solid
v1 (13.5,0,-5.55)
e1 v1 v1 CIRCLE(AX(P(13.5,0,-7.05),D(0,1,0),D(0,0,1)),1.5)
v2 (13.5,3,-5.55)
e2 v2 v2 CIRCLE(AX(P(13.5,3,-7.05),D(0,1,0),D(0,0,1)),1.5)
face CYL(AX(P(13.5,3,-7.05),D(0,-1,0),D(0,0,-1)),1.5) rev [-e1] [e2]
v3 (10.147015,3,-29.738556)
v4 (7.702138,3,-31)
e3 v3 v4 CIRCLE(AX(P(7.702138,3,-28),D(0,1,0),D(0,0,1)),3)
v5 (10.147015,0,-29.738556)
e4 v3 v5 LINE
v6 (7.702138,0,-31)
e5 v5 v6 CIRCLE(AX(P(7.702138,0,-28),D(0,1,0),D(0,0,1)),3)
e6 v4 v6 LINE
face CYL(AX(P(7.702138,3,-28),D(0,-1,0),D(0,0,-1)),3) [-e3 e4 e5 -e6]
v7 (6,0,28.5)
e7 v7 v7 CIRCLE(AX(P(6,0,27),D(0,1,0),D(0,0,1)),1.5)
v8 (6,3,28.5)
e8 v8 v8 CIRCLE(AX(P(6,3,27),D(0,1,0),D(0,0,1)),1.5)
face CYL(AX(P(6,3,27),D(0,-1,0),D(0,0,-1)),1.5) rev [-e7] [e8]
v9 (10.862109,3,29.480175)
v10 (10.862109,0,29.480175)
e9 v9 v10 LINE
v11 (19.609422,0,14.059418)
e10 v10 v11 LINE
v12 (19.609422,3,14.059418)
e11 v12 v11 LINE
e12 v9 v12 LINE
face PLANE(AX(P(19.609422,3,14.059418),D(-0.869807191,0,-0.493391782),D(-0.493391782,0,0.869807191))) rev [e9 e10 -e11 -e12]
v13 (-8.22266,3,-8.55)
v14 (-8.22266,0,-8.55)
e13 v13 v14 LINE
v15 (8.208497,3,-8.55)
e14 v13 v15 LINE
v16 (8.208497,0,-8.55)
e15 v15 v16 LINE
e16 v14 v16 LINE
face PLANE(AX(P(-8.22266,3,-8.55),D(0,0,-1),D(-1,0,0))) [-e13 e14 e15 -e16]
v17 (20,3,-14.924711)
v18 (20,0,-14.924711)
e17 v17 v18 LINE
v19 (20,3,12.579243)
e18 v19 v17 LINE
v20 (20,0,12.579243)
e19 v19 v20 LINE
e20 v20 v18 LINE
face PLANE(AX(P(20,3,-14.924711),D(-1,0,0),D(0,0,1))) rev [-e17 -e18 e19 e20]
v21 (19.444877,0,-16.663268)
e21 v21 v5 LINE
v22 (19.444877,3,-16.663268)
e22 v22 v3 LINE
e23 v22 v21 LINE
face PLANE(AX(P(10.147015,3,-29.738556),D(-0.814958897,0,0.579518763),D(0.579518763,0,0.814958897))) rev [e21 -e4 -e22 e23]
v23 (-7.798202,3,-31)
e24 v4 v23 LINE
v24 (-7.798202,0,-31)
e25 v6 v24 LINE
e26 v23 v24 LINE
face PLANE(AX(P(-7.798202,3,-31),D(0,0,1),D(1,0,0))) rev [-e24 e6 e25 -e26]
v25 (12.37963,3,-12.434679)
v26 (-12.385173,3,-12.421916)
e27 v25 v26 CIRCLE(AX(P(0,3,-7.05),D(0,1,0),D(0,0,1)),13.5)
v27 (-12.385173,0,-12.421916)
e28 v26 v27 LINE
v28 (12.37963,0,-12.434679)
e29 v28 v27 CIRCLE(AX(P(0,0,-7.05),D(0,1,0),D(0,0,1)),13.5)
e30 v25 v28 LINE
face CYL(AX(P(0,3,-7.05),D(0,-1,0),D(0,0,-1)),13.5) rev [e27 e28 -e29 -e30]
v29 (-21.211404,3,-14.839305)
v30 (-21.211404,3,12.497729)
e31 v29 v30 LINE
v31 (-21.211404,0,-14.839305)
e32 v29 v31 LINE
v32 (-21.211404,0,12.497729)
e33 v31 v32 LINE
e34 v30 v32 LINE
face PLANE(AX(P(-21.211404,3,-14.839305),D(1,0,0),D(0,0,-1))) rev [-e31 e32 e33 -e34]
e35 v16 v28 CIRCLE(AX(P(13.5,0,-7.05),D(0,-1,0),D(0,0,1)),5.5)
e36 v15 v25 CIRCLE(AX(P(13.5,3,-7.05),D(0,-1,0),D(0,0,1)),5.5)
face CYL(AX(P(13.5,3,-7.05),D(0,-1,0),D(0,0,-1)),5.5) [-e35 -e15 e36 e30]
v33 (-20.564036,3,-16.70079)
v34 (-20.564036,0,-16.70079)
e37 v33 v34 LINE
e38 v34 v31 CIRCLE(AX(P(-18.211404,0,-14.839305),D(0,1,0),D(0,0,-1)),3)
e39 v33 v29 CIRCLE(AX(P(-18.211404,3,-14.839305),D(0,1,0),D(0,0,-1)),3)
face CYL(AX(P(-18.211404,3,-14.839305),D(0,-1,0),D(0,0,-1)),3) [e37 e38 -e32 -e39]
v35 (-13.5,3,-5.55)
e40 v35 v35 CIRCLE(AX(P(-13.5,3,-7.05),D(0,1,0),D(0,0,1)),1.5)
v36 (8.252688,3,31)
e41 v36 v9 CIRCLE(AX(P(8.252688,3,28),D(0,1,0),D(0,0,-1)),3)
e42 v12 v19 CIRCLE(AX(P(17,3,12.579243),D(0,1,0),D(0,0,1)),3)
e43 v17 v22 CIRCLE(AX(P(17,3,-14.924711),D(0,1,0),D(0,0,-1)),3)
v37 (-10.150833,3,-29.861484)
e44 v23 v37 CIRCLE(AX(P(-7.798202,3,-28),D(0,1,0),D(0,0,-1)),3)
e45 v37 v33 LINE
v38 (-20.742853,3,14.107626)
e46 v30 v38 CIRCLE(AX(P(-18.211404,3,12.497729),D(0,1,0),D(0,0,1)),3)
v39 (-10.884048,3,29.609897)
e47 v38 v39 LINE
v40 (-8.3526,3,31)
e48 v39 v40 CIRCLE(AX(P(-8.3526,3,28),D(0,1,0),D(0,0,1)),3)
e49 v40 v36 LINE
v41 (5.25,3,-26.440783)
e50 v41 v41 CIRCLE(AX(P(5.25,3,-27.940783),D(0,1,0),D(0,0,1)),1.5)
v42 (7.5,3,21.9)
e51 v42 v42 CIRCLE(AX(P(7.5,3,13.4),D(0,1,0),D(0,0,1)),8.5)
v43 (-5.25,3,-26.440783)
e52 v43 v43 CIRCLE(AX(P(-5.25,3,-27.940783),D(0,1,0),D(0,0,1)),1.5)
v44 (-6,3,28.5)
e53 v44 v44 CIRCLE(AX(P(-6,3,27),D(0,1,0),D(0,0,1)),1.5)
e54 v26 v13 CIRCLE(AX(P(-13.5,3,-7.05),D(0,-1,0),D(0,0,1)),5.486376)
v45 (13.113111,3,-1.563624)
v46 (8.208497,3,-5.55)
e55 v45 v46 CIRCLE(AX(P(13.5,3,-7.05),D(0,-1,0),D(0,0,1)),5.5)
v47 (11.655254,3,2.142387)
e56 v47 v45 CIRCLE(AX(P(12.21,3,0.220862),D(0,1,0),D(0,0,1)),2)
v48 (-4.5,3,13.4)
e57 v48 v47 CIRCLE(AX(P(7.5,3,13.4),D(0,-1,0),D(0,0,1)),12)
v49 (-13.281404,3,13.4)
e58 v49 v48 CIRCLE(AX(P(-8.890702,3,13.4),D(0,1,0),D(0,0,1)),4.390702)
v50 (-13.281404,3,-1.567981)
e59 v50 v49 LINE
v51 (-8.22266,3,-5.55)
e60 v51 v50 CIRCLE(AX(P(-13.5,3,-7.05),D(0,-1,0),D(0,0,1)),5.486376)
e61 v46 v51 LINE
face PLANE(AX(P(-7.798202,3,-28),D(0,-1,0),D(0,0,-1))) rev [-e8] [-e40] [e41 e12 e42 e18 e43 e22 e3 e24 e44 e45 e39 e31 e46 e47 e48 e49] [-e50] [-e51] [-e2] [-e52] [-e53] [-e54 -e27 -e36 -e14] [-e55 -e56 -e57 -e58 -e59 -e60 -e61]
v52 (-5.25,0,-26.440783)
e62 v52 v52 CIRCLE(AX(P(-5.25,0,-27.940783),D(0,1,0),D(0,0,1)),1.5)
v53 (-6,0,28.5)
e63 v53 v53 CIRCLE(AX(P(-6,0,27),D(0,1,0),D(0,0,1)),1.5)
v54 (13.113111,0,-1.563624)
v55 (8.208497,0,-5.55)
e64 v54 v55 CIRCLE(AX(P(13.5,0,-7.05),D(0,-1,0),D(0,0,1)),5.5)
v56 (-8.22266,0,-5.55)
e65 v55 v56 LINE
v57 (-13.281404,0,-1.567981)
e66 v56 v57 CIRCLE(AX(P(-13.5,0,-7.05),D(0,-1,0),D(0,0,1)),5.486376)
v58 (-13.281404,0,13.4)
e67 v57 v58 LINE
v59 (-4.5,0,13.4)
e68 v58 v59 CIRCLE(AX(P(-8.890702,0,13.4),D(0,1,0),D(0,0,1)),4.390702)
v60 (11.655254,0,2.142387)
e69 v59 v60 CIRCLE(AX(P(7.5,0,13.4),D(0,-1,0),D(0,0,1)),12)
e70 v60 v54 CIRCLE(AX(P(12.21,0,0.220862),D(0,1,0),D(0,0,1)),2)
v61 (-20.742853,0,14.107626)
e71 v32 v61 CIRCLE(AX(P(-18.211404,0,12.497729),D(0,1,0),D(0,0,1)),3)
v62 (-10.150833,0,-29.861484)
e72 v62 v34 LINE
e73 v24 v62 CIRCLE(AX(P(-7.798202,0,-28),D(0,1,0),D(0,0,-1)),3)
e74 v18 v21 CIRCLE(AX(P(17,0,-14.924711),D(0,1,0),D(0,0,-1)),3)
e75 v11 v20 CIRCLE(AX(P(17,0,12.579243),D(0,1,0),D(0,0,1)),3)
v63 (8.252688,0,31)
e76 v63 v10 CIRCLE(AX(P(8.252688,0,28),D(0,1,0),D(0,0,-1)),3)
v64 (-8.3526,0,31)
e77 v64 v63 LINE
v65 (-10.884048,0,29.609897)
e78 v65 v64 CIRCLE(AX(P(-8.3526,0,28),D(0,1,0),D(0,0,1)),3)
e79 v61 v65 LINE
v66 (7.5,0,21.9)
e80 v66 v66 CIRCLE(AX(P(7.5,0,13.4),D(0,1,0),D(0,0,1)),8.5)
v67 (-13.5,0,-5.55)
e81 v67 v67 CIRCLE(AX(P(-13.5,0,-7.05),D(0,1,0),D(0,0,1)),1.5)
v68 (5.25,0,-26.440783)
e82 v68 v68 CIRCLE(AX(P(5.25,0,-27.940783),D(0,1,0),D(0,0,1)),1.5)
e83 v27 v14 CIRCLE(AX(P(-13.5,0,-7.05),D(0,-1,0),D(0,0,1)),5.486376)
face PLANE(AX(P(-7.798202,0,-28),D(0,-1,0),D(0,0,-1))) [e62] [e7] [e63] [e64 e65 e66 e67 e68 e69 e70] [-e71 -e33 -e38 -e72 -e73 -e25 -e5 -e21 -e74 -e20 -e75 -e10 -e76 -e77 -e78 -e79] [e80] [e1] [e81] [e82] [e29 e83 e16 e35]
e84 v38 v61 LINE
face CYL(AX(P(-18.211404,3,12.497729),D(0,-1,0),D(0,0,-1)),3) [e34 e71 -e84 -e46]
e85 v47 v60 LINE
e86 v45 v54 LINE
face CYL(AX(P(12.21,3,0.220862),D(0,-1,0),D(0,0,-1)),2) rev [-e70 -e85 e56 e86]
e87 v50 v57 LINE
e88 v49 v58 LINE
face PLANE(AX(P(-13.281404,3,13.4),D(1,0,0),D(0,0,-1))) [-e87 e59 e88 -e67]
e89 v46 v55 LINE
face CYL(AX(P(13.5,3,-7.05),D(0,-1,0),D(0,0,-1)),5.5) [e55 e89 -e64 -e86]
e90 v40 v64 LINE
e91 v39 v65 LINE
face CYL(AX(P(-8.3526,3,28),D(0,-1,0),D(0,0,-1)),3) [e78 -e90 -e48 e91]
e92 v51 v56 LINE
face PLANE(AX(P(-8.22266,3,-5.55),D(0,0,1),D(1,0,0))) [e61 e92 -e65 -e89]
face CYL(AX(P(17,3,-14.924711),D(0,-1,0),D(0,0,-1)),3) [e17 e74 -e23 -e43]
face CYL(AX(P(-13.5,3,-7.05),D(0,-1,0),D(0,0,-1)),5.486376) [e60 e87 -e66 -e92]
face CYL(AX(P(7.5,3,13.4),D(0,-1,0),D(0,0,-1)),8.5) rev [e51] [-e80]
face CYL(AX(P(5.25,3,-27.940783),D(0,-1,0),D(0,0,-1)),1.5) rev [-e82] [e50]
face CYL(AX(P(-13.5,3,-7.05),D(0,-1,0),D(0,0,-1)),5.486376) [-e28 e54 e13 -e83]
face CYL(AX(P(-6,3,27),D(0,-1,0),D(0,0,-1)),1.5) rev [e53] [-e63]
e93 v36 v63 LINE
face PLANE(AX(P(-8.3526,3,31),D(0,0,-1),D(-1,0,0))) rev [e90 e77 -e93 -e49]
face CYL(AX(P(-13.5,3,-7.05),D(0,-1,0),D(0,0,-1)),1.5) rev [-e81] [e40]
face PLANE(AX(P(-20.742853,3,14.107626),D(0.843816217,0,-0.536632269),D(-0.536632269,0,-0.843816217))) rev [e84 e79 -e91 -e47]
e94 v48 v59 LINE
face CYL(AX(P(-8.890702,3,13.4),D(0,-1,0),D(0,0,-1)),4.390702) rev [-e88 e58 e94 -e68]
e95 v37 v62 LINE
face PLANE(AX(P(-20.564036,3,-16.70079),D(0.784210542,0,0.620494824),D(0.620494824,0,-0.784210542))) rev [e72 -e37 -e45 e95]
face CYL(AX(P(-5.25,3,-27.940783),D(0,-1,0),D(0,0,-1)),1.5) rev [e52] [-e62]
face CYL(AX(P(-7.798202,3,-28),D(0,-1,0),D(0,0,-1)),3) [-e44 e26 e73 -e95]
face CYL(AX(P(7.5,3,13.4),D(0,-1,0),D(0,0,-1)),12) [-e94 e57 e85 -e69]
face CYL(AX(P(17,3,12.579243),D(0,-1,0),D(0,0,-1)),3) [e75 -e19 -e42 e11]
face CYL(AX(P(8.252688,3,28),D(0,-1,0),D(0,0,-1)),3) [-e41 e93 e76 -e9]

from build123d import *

# Parameters (mm, degrees)
SKETCH1_R          = 8.5
SKETCH1_R_2        = 1.5
BASE_FLANGE1_DEPTH = 3


# Sheet-metal steps are written as plain solids
with BuildPart() as part:
    # Sketch1 → Base-Flange1 (new body)
    with BuildSketch(Plane(origin=(0, 0, 0), x_dir=(1, 0, 0), z_dir=(0, 1, 0))):
        with BuildLine():
            Line((19.609421573, -14.059417906), (10.862109445, -29.480175346))
            ThreePointArc((10.862109445, -29.480175346), (9.762567662, -30.59234701), (8.252687872, -31))
            Line((8.252687872, -31), (-8.352599575, -31))
            ThreePointArc((-8.352599575, -31), (-9.796606082, -30.629609326), (-10.884048227, -29.609896806))
            Line((-10.884048227, -29.609896806), (-20.742852548, -14.107625594))
            ThreePointArc((-20.742852548, -14.107625594), (-21.091885276, -13.336076582), (-21.211403896, -12.497728788))
            Line((-21.211403896, -12.497728788), (-21.211403896, 14.839305313))
            ThreePointArc((-21.211403896, 14.839305313), (-21.044943633, 15.824725306), (-20.564035521, 16.700789784))
            Line((-20.564035521, 16.700789784), (-10.150833328, 29.861484472))
            ThreePointArc((-10.150833328, 29.861484472), (-9.105019706, 30.700412322), (-7.798201703, 31))
            Line((-7.798201703, 31), (7.702138241, 31))
            ThreePointArc((7.702138241, 31), (9.077698333, 30.666052219), (10.147014932, 29.738556288))
            Line((10.147014932, 29.738556288), (19.444876691, 16.663267527))
            ThreePointArc((19.444876691, 16.663267527), (19.857851472, 15.837226972), (20, 14.924711239))
            Line((20, 14.924711239), (20, -12.57924256))
            ThreePointArc((20, -12.57924256), (19.900712388, -13.344662472), (19.609421573, -14.059417906))
        make_face()
        with Locations(Location((7.5, -13.4, 0), (0, 0, 270))):
            Circle(SKETCH1_R, mode=Mode.SUBTRACT)
        with Locations(Location((6, -27, 0), (0, 0, 270))):
            Circle(SKETCH1_R_2, mode=Mode.SUBTRACT)
        with Locations(Location((-6, -27, 0), (0, 0, 270))):
            Circle(SKETCH1_R_2, mode=Mode.SUBTRACT)
        with Locations(Location((5.25, 27.940782939, 0), (0, 0, 270))):
            Circle(SKETCH1_R_2, mode=Mode.SUBTRACT)
        with Locations(Location((-5.25, 27.940782939, 0), (0, 0, 270))):
            Circle(SKETCH1_R_2, mode=Mode.SUBTRACT)
        with Locations(Location((13.5, 7.05, 0), (0, 0, 270))):
            Circle(SKETCH1_R_2, mode=Mode.SUBTRACT)
        with Locations(Location((-13.5, 7.05, 0), (0, 0, 270))):
            Circle(SKETCH1_R_2, mode=Mode.SUBTRACT)
        with BuildLine():
            Line((-13.281403896, 0), (-13.281403896, 1.567980996))
            ThreePointArc((-13.281403896, 1.567980996), (-10.106558233, 2.738982767), (-8.222660082, 5.55))
            Line((-8.222660082, 5.55), (8.208497378, 5.55))
            ThreePointArc((8.208497378, 5.55), (10.031018679, 2.781959631), (13.113110627, 1.563624456))
            ThreePointArc((13.113110627, 1.563624456), (14.07117407, -0.953003234), (11.655254401, -2.142386538))
            ThreePointArc((11.655254401, -2.142386538), (0.639353267, -3.554619032), (-4.5, -13.4))
            ThreePointArc((-4.5, -13.4), (-8.890701948, -17.790701948), (-13.281403896, -13.4))
            Line((-13.281403896, -13.4), (-13.281403896, 0))
        make_face(mode=Mode.SUBTRACT)
        with BuildLine():
            Line((-8.222660082, 8.55), (8.208497378, 8.55))
            ThreePointArc((8.208497378, 8.55), (9.751572067, 11.074833914), (12.37962963, 12.434679214))
            ThreePointArc((12.37962963, 12.434679214), (-0.006957749, 20.549998207), (-12.385173459, 12.42191571))
            ThreePointArc((-12.385173459, 12.42191571), (-9.763306163, 11.067142739), (-8.222660082, 8.55))
        make_face(mode=Mode.SUBTRACT)
    extrude(amount=BASE_FLANGE1_DEPTH)


solid = part.part
